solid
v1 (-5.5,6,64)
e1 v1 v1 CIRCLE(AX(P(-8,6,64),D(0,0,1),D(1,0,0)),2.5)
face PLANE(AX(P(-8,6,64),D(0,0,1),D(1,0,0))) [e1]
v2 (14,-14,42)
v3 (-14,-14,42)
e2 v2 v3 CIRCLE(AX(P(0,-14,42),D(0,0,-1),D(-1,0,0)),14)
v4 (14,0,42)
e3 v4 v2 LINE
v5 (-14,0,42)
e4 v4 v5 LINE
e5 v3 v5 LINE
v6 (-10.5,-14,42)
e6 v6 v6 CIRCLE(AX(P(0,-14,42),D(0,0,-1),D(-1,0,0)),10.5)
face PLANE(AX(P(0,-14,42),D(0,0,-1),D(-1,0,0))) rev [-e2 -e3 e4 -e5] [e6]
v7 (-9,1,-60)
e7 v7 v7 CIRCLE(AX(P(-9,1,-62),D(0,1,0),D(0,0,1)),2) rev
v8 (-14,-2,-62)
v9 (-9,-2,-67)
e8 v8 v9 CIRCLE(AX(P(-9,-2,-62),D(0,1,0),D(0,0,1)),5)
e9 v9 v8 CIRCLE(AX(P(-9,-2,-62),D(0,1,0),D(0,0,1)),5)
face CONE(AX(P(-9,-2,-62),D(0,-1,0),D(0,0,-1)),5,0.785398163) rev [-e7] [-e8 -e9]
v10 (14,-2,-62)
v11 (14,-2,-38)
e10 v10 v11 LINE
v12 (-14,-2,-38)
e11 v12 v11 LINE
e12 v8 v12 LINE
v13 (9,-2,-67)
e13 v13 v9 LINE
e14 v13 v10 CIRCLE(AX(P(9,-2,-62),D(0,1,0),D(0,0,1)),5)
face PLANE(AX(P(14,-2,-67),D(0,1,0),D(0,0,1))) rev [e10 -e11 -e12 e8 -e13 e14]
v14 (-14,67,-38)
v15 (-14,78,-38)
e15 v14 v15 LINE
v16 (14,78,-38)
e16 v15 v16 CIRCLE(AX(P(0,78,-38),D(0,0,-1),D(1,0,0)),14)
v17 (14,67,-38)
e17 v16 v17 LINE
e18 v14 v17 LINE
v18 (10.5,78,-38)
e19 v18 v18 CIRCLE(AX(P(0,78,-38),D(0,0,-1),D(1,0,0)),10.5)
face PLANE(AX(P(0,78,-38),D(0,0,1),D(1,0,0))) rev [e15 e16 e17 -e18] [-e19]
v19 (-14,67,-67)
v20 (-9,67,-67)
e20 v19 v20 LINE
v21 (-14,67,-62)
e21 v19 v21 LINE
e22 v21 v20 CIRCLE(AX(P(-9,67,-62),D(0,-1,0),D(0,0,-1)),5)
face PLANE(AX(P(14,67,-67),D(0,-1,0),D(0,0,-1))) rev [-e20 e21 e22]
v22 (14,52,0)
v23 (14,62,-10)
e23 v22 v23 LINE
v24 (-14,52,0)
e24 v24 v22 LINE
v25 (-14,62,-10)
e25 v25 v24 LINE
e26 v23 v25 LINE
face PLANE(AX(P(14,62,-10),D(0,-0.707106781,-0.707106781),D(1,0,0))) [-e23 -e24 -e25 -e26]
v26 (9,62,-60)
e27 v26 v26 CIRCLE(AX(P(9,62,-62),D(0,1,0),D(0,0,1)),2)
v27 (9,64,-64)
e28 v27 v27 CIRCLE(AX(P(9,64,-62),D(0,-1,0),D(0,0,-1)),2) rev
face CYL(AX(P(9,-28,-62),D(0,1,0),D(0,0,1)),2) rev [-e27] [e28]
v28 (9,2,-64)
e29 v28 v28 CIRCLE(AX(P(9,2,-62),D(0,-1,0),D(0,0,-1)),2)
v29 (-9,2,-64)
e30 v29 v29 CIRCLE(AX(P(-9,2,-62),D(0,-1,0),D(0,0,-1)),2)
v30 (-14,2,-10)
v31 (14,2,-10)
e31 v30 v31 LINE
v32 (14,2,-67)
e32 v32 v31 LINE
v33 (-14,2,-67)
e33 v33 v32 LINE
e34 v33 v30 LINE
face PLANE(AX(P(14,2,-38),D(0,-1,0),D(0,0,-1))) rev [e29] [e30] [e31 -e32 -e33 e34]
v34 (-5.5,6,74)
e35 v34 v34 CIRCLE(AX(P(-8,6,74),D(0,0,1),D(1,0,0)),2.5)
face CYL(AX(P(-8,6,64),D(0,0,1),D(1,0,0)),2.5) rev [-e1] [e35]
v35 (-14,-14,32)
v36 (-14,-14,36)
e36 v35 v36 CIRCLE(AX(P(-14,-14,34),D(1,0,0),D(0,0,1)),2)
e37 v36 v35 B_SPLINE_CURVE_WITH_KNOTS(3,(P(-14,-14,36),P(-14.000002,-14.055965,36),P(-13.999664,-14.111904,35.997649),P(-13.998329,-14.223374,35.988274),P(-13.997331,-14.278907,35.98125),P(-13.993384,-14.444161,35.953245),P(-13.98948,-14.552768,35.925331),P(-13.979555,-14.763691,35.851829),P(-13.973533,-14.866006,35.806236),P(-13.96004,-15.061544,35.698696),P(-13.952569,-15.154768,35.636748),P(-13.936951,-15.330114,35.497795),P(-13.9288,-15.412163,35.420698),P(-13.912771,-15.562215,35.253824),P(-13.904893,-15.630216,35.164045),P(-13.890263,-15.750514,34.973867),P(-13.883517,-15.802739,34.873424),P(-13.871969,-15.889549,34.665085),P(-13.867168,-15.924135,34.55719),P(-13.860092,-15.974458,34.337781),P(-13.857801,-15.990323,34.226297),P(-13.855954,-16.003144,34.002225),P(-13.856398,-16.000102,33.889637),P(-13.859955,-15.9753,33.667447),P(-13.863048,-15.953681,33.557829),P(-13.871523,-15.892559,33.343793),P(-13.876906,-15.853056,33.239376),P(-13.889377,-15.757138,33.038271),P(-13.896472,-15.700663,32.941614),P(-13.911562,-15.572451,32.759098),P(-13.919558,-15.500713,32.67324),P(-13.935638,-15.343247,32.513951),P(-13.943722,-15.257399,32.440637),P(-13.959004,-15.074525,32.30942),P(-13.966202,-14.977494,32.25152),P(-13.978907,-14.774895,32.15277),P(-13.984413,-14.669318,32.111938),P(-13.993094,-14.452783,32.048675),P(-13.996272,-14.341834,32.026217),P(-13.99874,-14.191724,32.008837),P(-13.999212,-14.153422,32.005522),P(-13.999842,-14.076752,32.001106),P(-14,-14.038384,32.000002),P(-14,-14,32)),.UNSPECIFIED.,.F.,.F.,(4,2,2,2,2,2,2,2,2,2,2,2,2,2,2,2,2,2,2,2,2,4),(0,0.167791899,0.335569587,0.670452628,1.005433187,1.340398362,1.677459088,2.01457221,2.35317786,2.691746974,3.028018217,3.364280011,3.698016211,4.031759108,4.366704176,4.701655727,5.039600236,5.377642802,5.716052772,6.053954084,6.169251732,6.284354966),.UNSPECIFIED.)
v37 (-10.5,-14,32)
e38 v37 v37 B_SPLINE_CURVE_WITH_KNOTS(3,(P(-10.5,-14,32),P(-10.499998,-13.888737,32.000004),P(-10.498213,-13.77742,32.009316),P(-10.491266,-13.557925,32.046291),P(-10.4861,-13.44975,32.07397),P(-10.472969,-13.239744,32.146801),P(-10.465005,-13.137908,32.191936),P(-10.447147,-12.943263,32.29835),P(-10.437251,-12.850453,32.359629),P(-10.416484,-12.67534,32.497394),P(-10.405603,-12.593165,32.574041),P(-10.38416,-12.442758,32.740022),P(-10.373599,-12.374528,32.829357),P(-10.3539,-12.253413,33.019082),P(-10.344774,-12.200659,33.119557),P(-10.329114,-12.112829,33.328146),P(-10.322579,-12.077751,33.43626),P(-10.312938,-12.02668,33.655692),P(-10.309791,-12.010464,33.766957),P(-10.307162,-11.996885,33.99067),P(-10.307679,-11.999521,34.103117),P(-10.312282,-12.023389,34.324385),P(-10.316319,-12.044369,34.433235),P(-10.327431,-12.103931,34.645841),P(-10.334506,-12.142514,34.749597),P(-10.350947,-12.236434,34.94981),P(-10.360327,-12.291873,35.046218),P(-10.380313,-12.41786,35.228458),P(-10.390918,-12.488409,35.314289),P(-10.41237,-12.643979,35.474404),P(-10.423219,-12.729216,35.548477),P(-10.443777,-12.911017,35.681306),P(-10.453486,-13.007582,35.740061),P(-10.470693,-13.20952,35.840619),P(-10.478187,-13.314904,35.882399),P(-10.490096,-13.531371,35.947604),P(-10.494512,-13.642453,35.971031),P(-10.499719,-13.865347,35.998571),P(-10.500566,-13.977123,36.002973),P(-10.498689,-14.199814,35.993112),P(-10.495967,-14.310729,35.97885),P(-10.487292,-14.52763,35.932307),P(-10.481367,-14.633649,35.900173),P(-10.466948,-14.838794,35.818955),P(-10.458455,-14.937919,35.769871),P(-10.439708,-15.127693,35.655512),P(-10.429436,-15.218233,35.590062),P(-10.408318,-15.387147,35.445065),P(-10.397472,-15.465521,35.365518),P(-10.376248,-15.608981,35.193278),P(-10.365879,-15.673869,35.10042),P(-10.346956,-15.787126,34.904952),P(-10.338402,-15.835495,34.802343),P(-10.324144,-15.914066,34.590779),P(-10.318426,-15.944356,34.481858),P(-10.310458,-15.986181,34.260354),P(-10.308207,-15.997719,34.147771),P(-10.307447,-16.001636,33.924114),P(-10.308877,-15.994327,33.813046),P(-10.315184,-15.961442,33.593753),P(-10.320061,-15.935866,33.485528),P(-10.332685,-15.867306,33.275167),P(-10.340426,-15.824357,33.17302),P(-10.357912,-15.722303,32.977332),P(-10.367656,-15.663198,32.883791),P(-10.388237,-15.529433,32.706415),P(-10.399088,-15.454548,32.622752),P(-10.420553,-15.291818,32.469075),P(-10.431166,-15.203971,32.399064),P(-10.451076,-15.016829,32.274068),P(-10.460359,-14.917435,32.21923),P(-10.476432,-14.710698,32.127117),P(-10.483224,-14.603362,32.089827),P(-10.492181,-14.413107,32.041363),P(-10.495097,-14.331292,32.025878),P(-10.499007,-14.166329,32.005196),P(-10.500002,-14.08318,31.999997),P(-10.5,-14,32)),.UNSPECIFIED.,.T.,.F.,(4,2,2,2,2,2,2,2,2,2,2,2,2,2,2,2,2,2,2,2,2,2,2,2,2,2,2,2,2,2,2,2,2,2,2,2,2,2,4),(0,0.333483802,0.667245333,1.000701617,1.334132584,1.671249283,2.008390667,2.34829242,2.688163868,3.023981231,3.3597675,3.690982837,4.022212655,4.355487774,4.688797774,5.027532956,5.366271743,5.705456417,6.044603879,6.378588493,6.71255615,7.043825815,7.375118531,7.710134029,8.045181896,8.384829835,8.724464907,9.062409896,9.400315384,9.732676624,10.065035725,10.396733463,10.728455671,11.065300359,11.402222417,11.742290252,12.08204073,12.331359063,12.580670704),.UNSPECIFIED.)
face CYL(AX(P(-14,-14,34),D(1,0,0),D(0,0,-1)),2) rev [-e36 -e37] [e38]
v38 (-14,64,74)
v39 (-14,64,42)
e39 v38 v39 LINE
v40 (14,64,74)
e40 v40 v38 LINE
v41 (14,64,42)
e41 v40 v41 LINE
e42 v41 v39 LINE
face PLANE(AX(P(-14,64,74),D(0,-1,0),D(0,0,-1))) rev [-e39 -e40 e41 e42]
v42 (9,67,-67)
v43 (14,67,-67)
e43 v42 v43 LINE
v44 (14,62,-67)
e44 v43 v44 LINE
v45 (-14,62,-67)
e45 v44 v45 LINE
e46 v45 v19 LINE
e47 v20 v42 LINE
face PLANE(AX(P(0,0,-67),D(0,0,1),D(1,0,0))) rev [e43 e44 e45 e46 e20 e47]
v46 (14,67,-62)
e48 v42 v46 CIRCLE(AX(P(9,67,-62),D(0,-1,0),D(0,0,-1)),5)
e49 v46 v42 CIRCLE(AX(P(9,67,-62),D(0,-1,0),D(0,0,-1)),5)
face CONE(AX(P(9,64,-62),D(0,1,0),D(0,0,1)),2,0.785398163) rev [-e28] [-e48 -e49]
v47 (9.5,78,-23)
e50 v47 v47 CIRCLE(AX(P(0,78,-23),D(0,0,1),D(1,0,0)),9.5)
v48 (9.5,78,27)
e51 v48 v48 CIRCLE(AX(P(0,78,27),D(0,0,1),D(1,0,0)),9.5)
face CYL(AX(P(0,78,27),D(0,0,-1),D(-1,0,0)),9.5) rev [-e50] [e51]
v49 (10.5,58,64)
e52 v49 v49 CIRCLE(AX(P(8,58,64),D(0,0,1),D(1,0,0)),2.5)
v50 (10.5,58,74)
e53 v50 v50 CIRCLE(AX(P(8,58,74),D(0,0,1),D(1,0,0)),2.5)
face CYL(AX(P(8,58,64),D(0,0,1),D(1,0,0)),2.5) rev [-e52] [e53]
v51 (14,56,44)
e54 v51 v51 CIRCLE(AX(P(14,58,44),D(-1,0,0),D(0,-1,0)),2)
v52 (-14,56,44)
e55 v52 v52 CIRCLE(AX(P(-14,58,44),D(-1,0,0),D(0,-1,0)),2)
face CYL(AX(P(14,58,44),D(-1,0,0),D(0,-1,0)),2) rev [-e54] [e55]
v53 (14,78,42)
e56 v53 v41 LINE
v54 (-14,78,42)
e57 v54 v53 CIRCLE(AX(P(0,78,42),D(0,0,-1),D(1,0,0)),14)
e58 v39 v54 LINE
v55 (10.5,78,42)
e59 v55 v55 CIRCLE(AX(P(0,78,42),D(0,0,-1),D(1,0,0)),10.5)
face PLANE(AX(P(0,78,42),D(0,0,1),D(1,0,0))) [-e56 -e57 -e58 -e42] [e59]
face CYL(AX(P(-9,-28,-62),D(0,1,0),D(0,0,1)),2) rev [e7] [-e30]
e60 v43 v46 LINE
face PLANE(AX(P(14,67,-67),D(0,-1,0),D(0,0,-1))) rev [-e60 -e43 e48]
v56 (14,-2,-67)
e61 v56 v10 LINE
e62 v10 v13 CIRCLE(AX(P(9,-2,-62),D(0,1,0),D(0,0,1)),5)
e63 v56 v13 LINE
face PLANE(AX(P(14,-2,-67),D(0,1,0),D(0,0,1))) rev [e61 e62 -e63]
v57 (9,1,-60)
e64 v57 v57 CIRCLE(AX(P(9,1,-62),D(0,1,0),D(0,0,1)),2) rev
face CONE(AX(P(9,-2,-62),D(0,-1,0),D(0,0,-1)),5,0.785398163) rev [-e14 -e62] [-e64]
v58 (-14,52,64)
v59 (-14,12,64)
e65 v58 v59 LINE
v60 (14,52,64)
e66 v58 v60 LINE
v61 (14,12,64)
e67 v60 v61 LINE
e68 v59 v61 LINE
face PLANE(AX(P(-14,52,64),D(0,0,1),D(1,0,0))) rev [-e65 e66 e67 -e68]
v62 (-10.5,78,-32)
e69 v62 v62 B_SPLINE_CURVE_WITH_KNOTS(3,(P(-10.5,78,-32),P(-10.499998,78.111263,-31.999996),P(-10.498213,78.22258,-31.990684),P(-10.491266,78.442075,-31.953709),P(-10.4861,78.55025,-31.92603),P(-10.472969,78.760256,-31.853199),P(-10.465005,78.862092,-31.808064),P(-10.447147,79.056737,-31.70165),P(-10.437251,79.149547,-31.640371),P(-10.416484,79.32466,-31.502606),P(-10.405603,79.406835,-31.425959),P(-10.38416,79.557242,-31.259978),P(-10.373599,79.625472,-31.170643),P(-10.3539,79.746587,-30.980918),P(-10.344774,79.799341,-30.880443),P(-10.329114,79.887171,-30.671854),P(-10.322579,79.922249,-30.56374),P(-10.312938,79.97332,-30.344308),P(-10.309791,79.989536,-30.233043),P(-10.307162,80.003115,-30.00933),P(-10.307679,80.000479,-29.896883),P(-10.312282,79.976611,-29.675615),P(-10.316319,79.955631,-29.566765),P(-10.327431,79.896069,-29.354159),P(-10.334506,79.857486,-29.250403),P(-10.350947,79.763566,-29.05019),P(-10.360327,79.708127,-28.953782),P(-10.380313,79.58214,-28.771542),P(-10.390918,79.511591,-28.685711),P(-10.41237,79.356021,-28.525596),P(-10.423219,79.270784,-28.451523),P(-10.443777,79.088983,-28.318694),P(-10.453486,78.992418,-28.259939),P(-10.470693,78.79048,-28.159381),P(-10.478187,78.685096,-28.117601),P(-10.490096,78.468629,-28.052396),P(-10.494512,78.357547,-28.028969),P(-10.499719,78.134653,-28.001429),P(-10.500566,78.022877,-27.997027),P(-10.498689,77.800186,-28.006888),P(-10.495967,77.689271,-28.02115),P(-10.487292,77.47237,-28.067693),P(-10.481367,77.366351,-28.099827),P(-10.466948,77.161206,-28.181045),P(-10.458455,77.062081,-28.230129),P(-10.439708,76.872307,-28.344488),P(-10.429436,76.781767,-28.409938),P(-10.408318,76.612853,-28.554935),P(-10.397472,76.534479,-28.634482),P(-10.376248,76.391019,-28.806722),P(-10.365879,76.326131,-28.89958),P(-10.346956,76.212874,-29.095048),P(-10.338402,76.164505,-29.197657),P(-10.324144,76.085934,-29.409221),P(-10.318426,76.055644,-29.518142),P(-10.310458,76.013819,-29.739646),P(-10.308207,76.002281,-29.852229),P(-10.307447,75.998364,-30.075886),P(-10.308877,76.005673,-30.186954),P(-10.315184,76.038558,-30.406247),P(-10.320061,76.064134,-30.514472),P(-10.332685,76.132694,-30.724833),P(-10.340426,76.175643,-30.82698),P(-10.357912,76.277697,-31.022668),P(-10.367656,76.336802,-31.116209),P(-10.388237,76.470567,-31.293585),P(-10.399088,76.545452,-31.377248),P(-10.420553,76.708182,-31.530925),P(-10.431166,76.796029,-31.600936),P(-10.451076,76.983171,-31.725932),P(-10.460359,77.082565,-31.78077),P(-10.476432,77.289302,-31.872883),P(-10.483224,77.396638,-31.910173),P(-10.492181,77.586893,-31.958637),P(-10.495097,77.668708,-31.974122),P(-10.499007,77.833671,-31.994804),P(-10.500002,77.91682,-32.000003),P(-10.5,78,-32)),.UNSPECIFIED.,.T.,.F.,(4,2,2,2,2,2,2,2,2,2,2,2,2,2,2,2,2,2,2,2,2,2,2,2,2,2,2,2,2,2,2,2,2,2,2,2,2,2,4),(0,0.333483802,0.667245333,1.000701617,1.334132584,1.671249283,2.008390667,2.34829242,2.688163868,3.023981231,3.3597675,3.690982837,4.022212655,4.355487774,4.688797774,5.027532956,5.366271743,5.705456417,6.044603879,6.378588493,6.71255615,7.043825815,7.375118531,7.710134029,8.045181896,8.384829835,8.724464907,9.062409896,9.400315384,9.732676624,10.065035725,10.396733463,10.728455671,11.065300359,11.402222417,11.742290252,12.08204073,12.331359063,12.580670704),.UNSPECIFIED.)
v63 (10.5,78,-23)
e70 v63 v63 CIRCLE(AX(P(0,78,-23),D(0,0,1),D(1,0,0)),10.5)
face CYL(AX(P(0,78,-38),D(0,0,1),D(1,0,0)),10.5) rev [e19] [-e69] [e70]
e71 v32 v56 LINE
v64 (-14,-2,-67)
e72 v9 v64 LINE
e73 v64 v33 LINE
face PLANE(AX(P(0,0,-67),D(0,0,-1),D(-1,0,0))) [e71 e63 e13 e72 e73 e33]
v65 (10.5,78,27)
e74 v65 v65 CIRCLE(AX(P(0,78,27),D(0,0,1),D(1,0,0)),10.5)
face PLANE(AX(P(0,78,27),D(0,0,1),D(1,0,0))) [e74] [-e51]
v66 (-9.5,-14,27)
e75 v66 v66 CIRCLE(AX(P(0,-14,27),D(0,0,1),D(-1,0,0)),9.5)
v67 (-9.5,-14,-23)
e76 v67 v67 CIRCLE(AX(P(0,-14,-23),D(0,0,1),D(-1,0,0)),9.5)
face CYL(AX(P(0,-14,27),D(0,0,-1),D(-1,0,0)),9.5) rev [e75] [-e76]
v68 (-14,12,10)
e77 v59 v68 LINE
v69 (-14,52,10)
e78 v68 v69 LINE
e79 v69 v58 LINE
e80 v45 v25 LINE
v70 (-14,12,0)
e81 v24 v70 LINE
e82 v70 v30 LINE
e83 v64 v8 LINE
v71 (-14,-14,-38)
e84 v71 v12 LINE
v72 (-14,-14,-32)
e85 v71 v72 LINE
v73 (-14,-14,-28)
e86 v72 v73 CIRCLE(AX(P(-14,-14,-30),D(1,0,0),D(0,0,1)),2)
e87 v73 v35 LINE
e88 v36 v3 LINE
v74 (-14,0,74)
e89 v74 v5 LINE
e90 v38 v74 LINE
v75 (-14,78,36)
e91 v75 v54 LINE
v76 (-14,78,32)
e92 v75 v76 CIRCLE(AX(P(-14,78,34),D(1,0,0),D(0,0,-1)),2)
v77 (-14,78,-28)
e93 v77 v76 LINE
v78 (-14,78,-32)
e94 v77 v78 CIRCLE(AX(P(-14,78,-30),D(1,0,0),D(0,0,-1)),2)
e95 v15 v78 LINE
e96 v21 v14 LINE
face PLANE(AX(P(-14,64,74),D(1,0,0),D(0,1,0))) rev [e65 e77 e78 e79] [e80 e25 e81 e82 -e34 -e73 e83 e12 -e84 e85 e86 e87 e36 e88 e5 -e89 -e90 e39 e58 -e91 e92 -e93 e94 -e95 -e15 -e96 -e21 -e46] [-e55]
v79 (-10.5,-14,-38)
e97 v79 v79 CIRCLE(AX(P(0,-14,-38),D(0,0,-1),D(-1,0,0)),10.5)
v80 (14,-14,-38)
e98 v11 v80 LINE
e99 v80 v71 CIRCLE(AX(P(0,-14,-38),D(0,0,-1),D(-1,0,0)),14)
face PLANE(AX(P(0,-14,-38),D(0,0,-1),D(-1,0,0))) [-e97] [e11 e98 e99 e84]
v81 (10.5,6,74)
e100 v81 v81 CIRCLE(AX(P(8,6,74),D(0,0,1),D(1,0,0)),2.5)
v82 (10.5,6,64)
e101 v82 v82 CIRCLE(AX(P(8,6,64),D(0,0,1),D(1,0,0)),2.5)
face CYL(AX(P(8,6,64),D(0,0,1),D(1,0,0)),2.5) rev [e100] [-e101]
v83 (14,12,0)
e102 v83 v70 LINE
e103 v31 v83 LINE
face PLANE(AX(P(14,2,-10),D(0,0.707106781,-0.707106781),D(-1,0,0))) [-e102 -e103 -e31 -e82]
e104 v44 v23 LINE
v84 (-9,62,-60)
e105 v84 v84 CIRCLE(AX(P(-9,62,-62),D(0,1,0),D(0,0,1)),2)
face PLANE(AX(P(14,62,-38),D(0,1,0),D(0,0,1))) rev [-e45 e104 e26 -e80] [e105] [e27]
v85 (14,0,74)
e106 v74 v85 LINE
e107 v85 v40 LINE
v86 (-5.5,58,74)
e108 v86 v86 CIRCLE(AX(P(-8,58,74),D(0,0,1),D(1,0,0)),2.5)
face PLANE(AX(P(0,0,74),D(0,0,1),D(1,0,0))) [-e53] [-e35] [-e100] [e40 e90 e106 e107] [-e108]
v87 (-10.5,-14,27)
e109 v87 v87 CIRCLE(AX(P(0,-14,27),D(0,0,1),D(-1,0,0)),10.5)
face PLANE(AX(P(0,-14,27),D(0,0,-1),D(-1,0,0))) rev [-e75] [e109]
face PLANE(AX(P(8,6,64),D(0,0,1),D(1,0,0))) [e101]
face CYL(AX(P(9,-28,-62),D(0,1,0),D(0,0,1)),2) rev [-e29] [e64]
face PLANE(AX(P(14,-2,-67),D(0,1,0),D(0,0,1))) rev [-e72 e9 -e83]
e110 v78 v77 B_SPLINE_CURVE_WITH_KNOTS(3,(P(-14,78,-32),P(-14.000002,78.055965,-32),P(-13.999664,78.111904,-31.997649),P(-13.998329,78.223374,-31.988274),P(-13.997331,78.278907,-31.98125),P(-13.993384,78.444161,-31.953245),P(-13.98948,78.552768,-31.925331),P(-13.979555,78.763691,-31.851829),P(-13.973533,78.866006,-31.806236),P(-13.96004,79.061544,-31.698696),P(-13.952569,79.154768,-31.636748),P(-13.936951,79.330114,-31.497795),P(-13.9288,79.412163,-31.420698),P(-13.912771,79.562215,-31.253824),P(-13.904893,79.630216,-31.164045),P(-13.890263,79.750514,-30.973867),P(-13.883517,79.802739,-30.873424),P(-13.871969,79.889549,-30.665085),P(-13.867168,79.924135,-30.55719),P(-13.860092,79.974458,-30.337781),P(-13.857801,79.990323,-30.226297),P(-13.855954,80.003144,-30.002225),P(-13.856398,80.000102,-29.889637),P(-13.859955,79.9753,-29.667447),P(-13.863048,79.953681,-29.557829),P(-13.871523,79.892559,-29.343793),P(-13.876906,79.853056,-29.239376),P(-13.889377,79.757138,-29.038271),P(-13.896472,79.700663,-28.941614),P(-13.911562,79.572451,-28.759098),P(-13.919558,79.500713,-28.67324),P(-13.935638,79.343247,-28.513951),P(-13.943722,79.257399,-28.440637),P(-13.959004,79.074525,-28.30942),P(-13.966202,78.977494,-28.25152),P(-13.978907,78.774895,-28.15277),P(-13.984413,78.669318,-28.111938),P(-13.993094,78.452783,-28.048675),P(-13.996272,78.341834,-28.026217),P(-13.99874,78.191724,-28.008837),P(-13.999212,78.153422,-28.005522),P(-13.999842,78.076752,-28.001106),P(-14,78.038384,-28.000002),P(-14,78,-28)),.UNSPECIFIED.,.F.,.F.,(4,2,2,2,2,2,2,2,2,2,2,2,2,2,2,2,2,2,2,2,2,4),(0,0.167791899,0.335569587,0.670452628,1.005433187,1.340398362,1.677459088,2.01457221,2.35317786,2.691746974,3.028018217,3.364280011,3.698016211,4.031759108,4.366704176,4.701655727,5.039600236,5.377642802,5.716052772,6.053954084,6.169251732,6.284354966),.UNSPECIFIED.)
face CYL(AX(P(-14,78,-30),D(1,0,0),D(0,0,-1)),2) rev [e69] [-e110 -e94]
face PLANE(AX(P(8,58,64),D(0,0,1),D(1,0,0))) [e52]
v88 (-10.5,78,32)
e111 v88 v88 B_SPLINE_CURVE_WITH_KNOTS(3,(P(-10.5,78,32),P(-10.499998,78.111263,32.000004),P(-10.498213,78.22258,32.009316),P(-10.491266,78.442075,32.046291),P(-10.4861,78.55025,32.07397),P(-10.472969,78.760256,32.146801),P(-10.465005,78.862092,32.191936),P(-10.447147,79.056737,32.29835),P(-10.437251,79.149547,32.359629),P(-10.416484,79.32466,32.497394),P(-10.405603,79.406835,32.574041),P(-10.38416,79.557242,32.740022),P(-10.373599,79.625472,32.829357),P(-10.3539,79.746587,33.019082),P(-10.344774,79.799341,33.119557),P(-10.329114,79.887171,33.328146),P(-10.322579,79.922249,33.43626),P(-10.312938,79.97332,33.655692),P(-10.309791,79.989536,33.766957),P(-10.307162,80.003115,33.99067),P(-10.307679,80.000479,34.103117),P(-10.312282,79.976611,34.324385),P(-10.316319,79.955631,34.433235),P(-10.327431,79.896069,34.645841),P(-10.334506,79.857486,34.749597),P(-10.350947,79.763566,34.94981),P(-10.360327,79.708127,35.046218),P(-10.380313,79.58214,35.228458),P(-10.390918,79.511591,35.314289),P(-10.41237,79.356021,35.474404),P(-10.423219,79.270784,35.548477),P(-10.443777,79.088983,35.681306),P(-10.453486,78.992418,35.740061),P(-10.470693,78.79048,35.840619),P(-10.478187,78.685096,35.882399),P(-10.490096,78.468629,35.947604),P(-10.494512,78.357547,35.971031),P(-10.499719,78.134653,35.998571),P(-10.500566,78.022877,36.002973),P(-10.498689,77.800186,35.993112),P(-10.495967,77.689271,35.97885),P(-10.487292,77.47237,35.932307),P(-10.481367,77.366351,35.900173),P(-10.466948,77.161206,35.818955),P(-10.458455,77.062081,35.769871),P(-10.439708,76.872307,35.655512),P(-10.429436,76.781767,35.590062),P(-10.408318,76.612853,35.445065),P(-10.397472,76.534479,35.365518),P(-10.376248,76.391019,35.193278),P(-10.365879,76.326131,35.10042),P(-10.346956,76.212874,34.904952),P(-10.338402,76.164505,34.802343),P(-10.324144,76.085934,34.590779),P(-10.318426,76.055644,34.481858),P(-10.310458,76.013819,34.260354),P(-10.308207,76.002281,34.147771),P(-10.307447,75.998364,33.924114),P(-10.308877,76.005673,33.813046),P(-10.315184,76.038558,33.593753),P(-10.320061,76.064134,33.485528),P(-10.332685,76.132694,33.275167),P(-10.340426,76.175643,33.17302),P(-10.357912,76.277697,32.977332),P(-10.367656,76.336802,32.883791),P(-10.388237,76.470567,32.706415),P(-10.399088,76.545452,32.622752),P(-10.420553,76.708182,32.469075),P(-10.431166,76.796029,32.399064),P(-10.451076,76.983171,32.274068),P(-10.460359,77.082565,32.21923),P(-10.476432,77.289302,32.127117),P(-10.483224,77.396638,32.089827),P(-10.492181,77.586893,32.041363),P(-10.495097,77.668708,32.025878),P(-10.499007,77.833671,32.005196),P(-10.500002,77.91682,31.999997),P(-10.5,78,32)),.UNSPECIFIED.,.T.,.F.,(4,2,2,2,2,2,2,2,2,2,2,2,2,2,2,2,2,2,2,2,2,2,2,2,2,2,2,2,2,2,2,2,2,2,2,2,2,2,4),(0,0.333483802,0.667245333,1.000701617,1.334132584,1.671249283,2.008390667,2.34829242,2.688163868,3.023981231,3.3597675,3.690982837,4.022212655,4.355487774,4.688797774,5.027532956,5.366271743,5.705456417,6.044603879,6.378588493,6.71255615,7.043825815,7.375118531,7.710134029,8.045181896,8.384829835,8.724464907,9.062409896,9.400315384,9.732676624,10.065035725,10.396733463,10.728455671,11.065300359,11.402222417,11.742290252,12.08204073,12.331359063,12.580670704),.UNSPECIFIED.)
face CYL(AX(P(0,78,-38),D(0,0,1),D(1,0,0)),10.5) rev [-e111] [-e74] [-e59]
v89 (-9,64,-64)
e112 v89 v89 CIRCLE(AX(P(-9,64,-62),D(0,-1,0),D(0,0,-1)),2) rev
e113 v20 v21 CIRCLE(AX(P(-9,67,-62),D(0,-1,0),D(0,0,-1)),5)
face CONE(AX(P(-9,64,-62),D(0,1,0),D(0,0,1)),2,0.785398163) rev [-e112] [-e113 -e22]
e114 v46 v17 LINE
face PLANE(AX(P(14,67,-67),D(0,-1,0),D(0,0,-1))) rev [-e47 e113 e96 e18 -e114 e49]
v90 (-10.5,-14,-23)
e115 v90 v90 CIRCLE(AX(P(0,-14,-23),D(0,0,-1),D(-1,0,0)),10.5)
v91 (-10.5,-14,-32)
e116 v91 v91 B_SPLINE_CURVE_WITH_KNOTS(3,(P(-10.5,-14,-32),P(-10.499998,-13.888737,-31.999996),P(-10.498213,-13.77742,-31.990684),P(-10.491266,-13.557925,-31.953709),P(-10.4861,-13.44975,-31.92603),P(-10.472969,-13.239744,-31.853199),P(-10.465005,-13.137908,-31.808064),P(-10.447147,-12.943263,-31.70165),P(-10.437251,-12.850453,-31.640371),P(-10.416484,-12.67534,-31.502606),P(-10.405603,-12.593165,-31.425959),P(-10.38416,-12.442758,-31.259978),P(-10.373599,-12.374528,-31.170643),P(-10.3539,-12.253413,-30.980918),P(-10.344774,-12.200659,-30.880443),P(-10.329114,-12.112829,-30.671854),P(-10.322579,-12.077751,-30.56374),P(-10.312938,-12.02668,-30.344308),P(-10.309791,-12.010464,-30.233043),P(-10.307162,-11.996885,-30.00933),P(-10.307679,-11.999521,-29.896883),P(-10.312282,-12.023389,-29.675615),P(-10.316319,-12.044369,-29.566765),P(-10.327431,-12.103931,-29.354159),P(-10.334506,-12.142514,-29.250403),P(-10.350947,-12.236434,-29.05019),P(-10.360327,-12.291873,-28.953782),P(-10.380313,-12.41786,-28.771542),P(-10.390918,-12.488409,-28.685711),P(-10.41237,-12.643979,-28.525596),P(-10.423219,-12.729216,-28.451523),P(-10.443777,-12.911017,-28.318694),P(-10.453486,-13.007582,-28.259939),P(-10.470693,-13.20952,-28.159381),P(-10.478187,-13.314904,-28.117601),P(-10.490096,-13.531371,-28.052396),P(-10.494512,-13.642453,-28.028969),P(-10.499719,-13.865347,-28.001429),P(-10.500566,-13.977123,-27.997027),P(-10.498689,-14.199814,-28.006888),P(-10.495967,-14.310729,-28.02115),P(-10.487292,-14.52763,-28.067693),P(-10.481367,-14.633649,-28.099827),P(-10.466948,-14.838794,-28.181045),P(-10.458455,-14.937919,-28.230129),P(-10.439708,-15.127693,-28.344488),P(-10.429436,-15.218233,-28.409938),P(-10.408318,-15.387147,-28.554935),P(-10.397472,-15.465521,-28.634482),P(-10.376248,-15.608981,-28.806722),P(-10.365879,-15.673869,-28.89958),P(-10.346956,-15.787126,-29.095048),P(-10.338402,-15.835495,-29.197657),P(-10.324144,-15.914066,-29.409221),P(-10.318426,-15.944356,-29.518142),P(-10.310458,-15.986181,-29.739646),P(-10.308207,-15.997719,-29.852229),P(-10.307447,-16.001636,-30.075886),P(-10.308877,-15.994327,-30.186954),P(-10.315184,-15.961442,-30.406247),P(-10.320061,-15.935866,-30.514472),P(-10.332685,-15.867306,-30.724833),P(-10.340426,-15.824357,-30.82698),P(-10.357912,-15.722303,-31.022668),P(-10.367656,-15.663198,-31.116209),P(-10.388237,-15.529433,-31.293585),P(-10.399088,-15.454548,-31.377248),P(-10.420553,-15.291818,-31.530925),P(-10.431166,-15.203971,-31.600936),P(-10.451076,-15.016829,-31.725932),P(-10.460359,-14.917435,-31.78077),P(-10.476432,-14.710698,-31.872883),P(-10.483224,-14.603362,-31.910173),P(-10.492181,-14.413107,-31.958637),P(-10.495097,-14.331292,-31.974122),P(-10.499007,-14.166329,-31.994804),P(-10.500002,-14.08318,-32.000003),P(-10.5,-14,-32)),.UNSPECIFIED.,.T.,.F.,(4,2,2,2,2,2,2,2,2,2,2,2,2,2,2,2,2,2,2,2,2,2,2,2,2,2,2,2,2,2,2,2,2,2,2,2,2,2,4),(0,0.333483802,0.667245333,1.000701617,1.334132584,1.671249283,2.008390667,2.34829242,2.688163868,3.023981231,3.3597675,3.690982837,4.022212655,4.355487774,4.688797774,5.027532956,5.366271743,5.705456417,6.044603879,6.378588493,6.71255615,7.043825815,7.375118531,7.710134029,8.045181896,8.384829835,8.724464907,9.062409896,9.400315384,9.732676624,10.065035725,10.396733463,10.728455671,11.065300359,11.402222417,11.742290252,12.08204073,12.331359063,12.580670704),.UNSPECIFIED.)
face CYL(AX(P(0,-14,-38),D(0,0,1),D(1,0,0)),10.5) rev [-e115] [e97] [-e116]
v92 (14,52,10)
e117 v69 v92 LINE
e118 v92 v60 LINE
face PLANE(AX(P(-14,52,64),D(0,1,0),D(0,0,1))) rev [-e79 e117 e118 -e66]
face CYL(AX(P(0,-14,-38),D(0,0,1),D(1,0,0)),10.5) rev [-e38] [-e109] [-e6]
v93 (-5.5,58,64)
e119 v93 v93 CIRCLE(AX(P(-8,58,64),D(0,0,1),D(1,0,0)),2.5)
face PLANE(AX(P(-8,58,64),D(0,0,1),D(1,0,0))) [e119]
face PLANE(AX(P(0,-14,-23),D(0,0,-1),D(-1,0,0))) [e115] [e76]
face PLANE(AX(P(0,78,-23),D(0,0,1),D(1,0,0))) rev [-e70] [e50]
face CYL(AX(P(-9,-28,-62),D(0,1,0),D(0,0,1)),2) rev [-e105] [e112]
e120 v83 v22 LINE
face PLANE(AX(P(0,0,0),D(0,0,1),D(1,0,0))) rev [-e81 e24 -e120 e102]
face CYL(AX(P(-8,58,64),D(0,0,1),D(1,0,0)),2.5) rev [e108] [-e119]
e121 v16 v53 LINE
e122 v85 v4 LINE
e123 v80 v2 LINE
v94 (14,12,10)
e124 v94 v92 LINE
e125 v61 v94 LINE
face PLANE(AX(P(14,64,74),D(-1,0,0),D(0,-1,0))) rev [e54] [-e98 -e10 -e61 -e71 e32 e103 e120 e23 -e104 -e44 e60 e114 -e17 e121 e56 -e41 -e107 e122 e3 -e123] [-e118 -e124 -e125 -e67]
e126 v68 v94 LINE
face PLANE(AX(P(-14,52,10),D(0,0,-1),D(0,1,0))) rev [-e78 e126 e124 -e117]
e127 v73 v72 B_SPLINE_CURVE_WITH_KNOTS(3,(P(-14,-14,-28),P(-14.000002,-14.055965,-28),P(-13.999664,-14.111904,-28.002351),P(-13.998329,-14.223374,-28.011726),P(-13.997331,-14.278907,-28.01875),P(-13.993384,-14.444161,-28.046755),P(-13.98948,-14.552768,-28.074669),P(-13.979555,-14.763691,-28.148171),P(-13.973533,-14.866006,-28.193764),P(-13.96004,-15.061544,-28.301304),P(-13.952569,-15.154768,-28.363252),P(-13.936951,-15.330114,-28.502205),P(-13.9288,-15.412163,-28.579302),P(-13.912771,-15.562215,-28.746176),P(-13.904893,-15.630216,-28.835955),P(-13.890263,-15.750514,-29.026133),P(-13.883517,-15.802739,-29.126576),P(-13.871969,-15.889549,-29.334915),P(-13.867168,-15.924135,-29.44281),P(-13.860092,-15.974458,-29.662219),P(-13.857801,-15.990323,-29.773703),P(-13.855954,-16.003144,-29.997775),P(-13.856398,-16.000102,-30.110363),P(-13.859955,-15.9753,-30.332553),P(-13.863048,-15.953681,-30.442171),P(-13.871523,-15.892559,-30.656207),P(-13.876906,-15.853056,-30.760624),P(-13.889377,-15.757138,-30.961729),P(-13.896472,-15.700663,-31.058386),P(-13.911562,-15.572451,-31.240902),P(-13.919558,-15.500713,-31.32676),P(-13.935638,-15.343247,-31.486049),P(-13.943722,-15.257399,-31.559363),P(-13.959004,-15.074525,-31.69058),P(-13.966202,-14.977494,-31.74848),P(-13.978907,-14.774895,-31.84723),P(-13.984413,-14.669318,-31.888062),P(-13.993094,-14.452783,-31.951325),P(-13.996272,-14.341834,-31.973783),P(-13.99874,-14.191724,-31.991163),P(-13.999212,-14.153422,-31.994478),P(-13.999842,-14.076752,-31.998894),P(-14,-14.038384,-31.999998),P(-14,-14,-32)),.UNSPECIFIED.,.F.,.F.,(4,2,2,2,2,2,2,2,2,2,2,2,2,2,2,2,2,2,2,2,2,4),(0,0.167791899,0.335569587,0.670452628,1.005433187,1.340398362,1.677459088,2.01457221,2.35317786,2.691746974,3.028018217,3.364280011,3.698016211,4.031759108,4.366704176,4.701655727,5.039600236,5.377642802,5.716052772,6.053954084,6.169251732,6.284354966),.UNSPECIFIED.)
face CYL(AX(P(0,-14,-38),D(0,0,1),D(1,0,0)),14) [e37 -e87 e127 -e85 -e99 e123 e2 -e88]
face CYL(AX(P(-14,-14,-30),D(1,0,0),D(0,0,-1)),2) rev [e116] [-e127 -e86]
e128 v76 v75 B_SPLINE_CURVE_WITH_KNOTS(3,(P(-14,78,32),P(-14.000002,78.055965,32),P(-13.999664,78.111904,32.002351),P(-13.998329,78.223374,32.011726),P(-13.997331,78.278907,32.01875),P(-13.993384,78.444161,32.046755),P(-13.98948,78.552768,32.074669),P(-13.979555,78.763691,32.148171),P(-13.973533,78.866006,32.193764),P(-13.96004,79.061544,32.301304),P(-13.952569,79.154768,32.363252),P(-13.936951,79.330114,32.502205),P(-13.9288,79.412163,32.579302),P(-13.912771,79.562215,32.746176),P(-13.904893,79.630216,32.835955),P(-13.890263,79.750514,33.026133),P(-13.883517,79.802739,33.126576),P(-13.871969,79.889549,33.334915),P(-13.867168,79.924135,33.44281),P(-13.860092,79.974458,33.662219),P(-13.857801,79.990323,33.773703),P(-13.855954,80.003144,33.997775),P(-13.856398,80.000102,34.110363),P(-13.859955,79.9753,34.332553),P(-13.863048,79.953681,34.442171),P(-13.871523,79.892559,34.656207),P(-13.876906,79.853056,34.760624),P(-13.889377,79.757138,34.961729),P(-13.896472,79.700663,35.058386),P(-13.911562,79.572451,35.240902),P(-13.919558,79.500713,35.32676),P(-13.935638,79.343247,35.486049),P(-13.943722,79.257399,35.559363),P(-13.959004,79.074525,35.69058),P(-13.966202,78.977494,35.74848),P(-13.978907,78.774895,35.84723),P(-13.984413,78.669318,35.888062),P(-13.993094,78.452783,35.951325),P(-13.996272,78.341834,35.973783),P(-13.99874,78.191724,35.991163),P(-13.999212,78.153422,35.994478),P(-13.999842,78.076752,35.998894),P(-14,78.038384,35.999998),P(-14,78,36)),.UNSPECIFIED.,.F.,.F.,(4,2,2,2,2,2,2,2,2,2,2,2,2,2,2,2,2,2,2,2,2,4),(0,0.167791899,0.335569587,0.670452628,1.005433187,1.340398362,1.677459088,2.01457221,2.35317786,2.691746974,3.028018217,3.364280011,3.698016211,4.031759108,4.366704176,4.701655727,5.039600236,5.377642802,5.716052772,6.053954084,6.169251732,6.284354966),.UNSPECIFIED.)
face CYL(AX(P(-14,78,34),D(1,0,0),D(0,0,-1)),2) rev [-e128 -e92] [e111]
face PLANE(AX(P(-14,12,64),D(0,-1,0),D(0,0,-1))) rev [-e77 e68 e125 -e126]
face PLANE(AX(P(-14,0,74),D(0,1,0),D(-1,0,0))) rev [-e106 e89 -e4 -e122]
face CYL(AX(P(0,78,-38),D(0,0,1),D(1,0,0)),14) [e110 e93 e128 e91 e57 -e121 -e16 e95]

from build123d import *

# Parameters (mm, degrees)
SKETCH_1_W               = 28
SKETCH_1_H               = 64
EXTRUDE_1_DEPTH          = 74
SKETCH_2_R               = 2.5
CUT_EXTRUDE_1_DEPTH      = 10
CUT_EXTRUDE_2_DEPTH      = 99.833192805
CUT_EXTRUDE_2_DEPTH_BACK = 99.833192805
SKETCH_3_W               = 54
SKETCH_3_H               = 40
EXTRUDE_2_DEPTH          = 80
SKETCH_6_R               = 10.5
CUT_EXTRUDE_3_DEPTH      = 123.719191653
SKETCH_11_W              = 28
SKETCH_11_H              = 5
SKETCH_11_H_2            = 4
EXTRUDE_5_DEPTH          = 67
SKETCH_12_R              = 2
CUT_EXTRUDE_8_DEPTH      = 122.231184107
CHAMFER_1_SIZE           = 10
SKETCH_13_R              = 10.5
SKETCH_13_R_2            = 9.5
EXTRUDE_6_DEPTH          = 25
SKETCH_14_R              = 2
CUT_EXTRUDE_9_DEPTH      = 119.894911582
SKETCH_15_R              = 2
CUT_EXTRUDE_10_DEPTH     = 122.342490596
CHAMFER_2_SIZE           = 3


with BuildPart() as part:
    # 草图1 → 凸台-拉伸1 (new body)
    with BuildSketch(Plane.XY):
        with Locations((0, 32)):
            Rectangle(SKETCH_1_W, SKETCH_1_H)
    extrude(amount=EXTRUDE_1_DEPTH)

    # 草图2 → 切除-拉伸1 (cut)
    with BuildSketch(Plane.XY.offset(74)):
        with Locations((-8, 58)):
            Circle(SKETCH_2_R)
        with Locations((8, 58)):
            Circle(SKETCH_2_R)
        with Locations((-8, 6)):
            Circle(SKETCH_2_R)
        with Locations((8, 6)):
            Circle(SKETCH_2_R)
    extrude(amount=-CUT_EXTRUDE_1_DEPTH, mode=Mode.SUBTRACT)

    # 草图3 → 切除-拉伸2 (cut, two sides: drawn at the far end of the back side and taken through both)
    with BuildSketch(Plane(origin=(0, 0, 0), x_dir=(0, 0, -1), z_dir=(1, 0, 0)).offset(-CUT_EXTRUDE_2_DEPTH_BACK)):
        with Locations((-37, 32)):
            Rectangle(SKETCH_3_W, SKETCH_3_H)
    extrude(amount=CUT_EXTRUDE_2_DEPTH + CUT_EXTRUDE_2_DEPTH_BACK, mode=Mode.SUBTRACT)

    # 草图4 → 凸台-拉伸2 (add)
    with BuildSketch(Plane(origin=(0, 0, 42), x_dir=(-1, 0, 0), z_dir=(0, 0, -1))):
        with BuildLine():
            Line((-14, 2), (14, 2))
            Line((14, 2), (14, -14))
            ThreePointArc((14, -14), (0, -28), (-14, -14))
            Line((-14, -14), (-14, 2))
        make_face()
        with BuildLine():
            Line((14, 62), (14, 78))
            ThreePointArc((14, 78), (0, 92), (-14, 78))
            Line((-14, 78), (-14, 62))
            Line((-14, 62), (14, 62))
        make_face()
    extrude(amount=EXTRUDE_2_DEPTH)

    # 草图6 → 切除-拉伸3 (cut, through all)
    with BuildSketch(Plane(origin=(0, 0, 42), x_dir=(-1, 0, 0), z_dir=(0, 0, -1))):
        with Locations((0, -14)):
            Circle(SKETCH_6_R)
        with Locations(Location((0, 78, 0), (0, 0, 180))):
            Circle(SKETCH_6_R)
    extrude(amount=CUT_EXTRUDE_3_DEPTH, mode=Mode.SUBTRACT)

    # 草图11 → 凸台-拉伸5 (add)
    with BuildSketch(Plane(origin=(0, 0, 0), x_dir=(-1, 0, 0), z_dir=(0, 0, -1))):
        with Locations((0, 64.5)):
            Rectangle(SKETCH_11_W, SKETCH_11_H)
        Rectangle(SKETCH_11_W, SKETCH_11_H_2)
    extrude(amount=EXTRUDE_5_DEPTH)

    # 草图12 → 切除-拉伸8 (cut, through all)
    with BuildSketch(Plane(origin=(0, 67, 0), x_dir=(1, 0, 0), z_dir=(0, 1, 0))):
        with Locations(Location((-9, 62, 0), (0, 0, 270))):
            Circle(SKETCH_12_R)
        with Locations(Location((9, 62, 0), (0, 0, 270))):
            Circle(SKETCH_12_R)
    extrude(amount=-CUT_EXTRUDE_8_DEPTH, mode=Mode.SUBTRACT)

    # 倒角1
    chamfer_1_edges = [part.edges().sort_by_distance(p)[0] for p in [
        (0, 62, 0),
        (0, 2, 0),
    ]]
    chamfer(chamfer_1_edges, length=CHAMFER_1_SIZE)

    # 草图13 → 凸台-拉伸6 (add, symmetric)
    # profile 1 of 2: a face of its own
    with BuildSketch(Plane.XY.offset(2)):
        with Locations((0, 78)):
            Circle(SKETCH_13_R)
        with Locations((0, 78)):
            Circle(SKETCH_13_R_2, mode=Mode.SUBTRACT)
    # profile 2 of 2: a face of its own
    with BuildSketch(Plane.XY.offset(2)):
        with Locations(Location((0, -14, 0), (0, 0, 180))):
            Circle(SKETCH_13_R)
        with Locations(Location((0, -14, 0), (0, 0, 180))):
            Circle(SKETCH_13_R_2, mode=Mode.SUBTRACT)
    extrude(amount=EXTRUDE_6_DEPTH, both=True)

    # 草图14 → 切除-拉伸9 (cut, through all)
    with BuildSketch(Plane(origin=(0, 0, 0), x_dir=(0, 0, -1), z_dir=(1, 0, 0))):
        with Locations((-34, 78)):
            Circle(SKETCH_14_R)
        with Locations((30, 78)):
            Circle(SKETCH_14_R)
        with Locations((30, -14)):
            Circle(SKETCH_14_R)
        with Locations((-34, -14)):
            Circle(SKETCH_14_R)
    extrude(amount=-CUT_EXTRUDE_9_DEPTH, mode=Mode.SUBTRACT)

    # 草图15 → 切除-拉伸10 (cut, through all)
    with BuildSketch(Plane.ZY.offset(14)):
        with Locations(Location((44, 58, 0), (0, 0, 270))):
            Circle(SKETCH_15_R)
    extrude(amount=-CUT_EXTRUDE_10_DEPTH, mode=Mode.SUBTRACT)

    # 倒角2
    chamfer_2_edges = [part.edges().sort_by_distance(p)[0] for p in [
        (-9, -2, -64),
        (-9, 67, -64),
        (9, -2, -64),
        (9, 67, -64),
    ]]
    chamfer(chamfer_2_edges, length=CHAMFER_2_SIZE - 0.0001)  # a hair under: the kernel refuses the full size


solid = part.part
